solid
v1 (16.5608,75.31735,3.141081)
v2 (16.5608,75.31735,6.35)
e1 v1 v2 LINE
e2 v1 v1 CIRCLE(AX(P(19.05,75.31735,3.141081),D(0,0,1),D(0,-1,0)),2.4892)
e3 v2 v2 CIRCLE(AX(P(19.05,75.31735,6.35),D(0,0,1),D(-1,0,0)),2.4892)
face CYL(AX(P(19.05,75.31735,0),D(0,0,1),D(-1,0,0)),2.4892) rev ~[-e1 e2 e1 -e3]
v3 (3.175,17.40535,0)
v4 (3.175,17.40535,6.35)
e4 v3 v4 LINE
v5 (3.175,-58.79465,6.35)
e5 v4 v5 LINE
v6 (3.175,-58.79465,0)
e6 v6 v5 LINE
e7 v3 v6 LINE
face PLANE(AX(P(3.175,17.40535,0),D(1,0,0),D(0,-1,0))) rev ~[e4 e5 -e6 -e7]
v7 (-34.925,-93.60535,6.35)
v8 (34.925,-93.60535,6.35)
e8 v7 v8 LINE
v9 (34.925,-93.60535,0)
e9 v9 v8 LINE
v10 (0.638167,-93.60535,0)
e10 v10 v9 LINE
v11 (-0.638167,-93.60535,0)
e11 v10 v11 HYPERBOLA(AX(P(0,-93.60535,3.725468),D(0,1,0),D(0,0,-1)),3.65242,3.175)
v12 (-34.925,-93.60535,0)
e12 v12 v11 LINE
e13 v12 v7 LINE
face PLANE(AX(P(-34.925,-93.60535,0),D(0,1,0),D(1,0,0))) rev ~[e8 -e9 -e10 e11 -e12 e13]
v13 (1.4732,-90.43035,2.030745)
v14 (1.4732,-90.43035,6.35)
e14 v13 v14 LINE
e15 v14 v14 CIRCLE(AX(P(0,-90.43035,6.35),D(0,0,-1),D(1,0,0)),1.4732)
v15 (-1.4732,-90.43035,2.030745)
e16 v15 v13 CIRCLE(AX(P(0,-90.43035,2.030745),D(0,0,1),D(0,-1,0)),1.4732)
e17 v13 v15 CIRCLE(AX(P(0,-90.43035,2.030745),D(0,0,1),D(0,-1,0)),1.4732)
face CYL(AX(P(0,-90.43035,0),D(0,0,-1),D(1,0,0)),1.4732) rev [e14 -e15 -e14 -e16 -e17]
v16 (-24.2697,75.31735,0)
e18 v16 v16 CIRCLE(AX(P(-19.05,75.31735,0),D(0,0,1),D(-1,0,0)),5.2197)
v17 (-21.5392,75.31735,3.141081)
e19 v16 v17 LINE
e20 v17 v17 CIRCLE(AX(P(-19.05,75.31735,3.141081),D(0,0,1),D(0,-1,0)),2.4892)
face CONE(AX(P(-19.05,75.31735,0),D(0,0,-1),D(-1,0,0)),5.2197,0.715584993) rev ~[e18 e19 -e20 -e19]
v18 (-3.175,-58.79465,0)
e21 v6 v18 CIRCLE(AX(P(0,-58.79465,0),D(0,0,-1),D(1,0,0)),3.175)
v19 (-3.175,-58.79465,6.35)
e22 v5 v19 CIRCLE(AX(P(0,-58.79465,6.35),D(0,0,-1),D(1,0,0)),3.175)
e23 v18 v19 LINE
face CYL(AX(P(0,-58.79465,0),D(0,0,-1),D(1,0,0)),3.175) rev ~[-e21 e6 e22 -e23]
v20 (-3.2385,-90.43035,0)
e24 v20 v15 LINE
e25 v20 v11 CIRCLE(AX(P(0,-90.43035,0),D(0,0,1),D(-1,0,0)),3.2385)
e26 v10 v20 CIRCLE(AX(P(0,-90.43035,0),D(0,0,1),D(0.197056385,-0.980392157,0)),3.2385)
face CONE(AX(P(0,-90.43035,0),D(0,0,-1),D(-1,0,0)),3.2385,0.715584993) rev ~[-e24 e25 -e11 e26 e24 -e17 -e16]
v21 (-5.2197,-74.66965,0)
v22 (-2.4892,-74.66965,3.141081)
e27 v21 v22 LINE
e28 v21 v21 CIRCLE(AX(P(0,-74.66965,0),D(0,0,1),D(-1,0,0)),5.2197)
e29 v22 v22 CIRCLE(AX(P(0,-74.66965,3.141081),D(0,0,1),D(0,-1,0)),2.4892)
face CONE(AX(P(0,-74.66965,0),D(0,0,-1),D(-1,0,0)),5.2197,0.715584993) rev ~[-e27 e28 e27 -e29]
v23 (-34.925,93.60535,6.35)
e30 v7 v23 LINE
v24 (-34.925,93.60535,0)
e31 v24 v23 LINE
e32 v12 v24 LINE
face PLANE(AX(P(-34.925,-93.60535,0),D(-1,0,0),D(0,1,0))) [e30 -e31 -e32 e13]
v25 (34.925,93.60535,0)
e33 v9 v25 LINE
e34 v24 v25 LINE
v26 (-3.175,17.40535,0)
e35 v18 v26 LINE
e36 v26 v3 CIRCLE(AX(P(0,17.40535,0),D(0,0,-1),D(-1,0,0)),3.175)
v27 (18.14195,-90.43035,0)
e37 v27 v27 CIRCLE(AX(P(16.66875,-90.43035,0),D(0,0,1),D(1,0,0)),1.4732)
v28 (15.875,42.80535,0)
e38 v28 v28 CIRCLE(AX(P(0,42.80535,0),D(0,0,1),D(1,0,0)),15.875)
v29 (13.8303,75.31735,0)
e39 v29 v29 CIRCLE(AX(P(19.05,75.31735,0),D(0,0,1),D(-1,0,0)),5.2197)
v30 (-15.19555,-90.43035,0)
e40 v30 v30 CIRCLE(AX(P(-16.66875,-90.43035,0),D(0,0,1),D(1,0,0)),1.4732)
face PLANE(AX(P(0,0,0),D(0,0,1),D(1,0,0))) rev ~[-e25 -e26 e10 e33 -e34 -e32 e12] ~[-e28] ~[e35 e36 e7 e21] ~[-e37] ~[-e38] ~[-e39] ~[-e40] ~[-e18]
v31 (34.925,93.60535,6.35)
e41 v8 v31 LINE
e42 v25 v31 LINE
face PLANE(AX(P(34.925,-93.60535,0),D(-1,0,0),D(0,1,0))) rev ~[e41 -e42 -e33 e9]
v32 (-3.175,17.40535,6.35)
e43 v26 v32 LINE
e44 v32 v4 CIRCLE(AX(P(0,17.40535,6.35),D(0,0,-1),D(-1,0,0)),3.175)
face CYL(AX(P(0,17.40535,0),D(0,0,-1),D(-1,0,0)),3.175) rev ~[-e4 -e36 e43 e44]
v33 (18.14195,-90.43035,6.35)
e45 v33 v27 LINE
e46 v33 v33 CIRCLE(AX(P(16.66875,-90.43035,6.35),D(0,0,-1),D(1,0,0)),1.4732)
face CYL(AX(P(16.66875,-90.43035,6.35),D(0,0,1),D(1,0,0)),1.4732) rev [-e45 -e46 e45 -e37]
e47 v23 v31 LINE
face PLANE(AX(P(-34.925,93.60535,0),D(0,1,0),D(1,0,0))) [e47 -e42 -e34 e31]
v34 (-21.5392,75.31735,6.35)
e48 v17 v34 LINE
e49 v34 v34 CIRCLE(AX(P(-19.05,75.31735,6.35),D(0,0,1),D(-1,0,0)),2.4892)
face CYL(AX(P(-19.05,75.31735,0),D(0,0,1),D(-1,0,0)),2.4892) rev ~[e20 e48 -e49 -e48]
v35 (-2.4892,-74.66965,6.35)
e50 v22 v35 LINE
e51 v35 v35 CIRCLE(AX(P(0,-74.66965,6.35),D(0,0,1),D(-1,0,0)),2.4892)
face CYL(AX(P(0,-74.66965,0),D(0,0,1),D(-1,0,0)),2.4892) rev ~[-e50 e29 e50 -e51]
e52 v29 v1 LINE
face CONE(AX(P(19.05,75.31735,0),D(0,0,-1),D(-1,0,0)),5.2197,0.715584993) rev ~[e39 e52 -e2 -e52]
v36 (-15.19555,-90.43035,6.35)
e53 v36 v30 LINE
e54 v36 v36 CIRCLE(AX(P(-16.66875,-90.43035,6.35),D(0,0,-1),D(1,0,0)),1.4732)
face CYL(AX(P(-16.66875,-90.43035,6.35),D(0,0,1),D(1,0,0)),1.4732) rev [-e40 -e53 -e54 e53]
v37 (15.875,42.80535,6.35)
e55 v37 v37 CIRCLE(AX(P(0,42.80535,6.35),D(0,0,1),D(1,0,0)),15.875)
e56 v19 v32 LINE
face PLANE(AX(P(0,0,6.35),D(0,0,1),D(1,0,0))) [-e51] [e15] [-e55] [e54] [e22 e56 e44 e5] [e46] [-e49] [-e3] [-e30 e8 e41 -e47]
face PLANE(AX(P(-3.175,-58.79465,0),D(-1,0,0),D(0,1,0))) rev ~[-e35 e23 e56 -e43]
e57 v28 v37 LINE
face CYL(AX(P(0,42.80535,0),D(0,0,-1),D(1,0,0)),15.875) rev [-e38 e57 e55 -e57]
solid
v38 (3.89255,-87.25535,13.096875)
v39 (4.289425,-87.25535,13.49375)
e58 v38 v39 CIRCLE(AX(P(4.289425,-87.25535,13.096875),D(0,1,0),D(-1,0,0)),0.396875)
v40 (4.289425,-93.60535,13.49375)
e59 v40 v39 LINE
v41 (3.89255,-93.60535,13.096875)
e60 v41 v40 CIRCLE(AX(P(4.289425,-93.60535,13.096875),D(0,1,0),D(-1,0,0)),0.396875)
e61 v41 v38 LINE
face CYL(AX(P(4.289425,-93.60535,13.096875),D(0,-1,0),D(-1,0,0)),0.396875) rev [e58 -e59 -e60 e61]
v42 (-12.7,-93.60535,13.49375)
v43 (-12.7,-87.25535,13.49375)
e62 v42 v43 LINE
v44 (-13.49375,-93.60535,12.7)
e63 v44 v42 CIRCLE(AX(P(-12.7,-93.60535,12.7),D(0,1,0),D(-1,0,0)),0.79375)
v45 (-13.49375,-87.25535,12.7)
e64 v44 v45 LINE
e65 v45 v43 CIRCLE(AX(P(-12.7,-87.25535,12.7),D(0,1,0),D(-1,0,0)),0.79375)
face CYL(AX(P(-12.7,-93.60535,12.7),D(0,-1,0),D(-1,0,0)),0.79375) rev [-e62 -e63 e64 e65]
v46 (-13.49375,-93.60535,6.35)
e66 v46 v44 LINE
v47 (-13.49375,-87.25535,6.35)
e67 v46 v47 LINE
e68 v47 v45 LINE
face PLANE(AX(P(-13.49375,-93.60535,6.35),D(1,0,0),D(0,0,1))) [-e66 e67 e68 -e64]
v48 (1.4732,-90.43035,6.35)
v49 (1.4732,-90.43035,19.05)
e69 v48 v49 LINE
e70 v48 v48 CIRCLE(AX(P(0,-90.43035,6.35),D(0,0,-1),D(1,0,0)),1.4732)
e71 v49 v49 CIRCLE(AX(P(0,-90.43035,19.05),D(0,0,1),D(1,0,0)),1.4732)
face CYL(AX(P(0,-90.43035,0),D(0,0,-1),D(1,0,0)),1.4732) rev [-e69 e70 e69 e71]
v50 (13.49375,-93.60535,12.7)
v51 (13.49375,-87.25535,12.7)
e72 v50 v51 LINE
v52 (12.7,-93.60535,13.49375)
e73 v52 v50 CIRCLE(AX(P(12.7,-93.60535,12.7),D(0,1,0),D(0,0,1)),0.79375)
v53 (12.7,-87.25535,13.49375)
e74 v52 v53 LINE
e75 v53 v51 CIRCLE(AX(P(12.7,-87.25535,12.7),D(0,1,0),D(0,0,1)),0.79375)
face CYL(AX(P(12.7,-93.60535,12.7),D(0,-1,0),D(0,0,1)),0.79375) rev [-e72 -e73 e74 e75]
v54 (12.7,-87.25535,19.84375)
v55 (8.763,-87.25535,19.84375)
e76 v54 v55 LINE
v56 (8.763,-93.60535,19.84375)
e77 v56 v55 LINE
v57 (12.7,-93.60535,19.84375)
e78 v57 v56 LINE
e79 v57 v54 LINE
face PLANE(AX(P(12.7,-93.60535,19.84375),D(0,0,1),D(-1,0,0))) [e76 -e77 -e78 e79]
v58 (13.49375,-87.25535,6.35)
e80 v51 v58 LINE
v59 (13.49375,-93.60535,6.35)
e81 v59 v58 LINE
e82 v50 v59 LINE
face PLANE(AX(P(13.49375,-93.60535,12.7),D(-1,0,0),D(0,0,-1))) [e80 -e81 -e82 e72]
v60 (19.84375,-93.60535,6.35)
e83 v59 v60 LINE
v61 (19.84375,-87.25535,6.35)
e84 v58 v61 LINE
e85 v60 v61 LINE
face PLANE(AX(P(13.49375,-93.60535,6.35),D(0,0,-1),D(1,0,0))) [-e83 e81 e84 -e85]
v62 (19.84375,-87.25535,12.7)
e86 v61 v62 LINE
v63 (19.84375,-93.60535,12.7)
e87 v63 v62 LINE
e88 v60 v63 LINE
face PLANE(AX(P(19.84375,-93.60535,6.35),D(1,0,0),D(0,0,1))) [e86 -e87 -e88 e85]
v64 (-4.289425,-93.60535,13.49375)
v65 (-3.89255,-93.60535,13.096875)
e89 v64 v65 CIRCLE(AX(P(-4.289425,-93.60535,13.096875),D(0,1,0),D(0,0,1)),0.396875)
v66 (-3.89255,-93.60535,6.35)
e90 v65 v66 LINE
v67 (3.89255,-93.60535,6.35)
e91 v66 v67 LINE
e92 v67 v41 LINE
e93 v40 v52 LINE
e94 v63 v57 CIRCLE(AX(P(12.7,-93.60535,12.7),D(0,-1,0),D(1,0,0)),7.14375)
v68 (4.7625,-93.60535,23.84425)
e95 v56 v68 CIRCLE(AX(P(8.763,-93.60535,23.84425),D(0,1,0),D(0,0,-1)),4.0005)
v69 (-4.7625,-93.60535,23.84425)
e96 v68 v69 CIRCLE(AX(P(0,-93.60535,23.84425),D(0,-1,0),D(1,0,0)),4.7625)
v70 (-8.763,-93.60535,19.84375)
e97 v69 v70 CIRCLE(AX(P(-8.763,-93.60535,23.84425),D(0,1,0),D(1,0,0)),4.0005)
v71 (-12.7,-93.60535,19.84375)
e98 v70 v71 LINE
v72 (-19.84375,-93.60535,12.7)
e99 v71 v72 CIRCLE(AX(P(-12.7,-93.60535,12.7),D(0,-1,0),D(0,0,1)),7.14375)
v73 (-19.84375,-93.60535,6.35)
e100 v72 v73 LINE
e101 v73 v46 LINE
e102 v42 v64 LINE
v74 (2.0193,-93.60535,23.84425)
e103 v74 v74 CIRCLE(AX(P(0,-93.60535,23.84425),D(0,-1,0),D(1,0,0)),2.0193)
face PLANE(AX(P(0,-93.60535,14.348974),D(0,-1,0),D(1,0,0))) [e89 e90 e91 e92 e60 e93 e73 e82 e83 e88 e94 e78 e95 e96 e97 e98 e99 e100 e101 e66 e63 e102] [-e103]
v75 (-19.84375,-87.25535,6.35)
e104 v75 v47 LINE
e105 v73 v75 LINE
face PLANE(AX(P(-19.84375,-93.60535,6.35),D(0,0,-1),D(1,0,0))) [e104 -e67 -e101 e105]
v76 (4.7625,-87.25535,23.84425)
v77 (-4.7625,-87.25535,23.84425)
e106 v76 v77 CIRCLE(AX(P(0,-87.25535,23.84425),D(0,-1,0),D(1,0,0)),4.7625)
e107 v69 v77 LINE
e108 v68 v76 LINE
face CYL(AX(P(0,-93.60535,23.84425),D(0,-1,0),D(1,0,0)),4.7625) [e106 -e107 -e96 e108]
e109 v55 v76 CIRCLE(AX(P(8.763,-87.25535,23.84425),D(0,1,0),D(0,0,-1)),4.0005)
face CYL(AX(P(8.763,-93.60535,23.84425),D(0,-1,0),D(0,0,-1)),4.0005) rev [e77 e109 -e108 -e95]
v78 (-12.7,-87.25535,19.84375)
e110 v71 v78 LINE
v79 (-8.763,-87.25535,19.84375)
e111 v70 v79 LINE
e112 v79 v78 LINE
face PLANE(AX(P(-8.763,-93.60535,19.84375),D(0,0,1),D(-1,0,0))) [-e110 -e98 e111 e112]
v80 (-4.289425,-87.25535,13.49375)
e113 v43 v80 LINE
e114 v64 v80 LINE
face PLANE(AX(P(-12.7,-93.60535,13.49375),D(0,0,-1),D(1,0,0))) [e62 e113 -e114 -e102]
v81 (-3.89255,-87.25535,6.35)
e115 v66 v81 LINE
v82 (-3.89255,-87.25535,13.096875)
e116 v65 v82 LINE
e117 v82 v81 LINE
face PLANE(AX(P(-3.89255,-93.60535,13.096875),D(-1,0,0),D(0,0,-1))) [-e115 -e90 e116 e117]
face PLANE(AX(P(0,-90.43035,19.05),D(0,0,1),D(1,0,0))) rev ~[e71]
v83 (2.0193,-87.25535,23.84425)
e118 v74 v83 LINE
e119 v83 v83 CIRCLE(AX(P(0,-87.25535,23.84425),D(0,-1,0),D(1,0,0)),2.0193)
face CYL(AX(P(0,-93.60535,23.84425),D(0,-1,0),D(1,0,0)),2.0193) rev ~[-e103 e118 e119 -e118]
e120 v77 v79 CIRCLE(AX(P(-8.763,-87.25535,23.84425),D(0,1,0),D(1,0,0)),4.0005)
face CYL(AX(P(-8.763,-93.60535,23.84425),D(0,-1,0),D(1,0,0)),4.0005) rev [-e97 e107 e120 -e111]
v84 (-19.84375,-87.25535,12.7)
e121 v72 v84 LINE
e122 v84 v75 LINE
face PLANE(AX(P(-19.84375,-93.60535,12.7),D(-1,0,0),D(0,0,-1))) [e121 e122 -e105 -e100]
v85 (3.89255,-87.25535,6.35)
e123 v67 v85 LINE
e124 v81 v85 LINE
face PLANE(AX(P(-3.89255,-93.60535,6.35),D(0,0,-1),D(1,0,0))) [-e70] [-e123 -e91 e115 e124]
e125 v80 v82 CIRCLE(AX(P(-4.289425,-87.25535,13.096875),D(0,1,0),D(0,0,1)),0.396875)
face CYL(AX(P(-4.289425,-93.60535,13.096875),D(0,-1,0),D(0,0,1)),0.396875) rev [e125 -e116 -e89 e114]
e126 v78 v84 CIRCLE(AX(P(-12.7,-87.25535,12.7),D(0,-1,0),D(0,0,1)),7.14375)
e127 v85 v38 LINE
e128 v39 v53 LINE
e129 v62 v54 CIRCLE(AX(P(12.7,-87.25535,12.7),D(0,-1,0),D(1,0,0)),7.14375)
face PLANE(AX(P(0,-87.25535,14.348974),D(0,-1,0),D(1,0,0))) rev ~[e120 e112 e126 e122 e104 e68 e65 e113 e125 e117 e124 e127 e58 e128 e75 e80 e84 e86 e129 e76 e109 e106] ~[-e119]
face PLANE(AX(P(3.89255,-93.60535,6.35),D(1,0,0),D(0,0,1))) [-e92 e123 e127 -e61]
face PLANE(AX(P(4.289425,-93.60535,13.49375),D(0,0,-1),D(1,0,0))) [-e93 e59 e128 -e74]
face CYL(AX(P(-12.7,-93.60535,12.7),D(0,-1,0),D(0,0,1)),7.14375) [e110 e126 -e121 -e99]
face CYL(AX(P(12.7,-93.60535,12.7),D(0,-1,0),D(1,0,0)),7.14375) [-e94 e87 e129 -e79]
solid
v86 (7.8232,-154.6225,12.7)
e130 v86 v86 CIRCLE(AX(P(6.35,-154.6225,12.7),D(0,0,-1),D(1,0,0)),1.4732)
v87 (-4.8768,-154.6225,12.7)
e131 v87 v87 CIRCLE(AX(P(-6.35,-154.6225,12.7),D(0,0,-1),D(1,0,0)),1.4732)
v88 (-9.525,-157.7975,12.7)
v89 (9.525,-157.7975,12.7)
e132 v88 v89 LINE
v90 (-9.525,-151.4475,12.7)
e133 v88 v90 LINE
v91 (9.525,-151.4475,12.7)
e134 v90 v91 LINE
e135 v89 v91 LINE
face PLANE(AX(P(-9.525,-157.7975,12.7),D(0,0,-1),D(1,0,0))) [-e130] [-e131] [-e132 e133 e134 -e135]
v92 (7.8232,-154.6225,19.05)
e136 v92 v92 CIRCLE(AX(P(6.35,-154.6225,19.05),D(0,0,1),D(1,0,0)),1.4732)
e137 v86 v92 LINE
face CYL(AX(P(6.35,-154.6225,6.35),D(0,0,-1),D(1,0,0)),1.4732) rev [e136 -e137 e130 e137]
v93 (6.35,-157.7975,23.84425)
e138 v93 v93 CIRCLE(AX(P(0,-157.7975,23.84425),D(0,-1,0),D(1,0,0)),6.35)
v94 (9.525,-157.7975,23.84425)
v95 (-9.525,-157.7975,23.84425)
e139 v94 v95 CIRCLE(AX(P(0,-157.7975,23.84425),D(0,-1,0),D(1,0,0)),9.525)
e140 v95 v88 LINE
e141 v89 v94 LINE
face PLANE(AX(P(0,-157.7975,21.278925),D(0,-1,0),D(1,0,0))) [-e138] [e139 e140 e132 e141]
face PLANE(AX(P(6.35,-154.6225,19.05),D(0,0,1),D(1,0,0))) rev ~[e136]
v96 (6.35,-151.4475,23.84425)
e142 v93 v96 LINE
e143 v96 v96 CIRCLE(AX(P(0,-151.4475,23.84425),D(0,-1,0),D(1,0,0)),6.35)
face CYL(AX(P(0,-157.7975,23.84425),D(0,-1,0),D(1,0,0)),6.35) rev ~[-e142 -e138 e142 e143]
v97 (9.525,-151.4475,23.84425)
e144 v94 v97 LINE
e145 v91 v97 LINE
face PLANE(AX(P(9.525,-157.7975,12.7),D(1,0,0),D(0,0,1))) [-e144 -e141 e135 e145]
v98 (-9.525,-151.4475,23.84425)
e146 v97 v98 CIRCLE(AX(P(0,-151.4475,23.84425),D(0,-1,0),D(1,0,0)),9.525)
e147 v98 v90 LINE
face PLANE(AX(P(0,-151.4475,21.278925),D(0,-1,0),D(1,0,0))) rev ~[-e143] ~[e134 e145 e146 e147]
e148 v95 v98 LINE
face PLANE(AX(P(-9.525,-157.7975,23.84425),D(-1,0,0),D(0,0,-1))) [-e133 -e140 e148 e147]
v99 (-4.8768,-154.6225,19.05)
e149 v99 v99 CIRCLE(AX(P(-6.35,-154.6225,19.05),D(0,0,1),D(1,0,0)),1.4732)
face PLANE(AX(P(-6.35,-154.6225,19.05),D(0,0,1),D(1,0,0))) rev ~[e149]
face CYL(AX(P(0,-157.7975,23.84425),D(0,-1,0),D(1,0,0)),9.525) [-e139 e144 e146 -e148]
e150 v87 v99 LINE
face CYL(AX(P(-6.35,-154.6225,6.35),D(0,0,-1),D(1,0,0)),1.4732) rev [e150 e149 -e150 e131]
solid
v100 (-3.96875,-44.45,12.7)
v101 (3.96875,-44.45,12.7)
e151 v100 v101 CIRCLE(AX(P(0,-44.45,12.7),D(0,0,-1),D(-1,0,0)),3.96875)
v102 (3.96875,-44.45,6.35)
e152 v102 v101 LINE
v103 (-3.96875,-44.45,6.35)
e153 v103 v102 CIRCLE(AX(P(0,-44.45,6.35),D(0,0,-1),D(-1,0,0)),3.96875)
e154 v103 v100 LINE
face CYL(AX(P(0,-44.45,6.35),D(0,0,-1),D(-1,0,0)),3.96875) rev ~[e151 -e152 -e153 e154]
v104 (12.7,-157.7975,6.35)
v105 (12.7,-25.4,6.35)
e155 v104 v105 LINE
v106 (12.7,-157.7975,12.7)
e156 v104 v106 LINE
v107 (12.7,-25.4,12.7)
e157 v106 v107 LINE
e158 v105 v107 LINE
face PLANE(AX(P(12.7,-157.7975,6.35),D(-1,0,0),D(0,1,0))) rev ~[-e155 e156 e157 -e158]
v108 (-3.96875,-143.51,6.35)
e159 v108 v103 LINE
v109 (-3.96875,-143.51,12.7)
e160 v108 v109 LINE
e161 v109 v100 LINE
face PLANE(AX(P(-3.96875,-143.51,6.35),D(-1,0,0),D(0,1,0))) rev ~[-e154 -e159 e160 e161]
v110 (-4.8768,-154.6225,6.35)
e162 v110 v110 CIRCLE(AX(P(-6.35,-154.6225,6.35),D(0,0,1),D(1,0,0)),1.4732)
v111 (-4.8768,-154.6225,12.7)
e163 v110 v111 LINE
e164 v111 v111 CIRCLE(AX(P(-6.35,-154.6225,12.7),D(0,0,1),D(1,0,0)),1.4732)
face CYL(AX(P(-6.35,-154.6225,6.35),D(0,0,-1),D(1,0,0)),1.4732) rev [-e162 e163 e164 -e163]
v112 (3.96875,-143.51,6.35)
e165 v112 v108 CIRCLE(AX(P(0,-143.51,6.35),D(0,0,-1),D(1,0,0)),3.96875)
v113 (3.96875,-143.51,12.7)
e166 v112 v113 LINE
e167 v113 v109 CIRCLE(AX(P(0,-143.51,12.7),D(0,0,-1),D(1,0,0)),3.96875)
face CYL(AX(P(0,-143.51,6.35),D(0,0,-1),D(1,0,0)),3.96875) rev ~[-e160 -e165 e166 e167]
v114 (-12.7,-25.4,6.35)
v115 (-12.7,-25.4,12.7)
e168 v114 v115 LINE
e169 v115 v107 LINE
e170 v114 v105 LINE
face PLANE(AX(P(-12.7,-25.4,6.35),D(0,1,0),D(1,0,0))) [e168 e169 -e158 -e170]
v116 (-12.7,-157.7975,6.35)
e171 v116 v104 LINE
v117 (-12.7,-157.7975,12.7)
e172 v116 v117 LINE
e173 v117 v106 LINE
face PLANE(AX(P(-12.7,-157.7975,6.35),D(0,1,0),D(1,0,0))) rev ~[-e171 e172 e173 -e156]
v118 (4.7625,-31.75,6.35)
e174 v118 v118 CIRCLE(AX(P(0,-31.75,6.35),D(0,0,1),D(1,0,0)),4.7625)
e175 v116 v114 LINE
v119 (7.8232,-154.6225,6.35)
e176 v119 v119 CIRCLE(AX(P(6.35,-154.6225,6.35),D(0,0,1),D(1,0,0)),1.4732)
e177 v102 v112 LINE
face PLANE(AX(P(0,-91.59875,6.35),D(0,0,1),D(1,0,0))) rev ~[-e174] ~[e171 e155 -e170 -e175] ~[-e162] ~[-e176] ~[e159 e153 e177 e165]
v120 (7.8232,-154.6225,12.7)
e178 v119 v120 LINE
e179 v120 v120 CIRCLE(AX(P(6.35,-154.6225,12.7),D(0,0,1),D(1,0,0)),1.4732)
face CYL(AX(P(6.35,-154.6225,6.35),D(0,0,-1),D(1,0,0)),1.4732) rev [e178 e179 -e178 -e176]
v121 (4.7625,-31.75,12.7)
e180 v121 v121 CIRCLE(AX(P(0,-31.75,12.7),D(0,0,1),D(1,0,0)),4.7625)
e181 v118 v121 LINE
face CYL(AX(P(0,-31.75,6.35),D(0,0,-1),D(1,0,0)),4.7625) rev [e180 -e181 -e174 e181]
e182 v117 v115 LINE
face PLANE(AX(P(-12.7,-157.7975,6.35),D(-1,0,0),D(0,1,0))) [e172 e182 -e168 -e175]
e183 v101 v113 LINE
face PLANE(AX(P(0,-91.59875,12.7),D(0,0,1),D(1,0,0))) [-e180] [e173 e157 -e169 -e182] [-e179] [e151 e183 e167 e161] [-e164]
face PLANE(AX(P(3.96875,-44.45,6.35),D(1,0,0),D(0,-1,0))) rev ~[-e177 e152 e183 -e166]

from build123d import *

# Parameters (mm, degrees)
F2_W            = 69.85
F2_H            = 187.2107
F2_R            = 1.4732
F2_R_2          = 2.15265
F2_R_3          = 15.875
F3_DEPTH        = 6.35
F4_W            = 25.4
F4_H            = 132.3975
F4_R            = 1.4732
F4_R_2          = 4.7625
F5_DEPTH        = 6.35
F6_R            = 2.0193
F7_DEPTH        = 6.35
F8_R            = 6.35
F9_DEPTH        = 6.35
F10_R           = 1.4732
F11_DEPTH       = 6.351
F12_D           = 4.9784
F12_CSINK_D     = 10.4394
F12_CSINK_ANGLE = 82
F13_D           = 2.9464
F13_CSINK_D     = 6.477
F13_CSINK_ANGLE = 82
F14_DEPTH       = 12.7
F15_DEPTH       = 19.05


# Not quite as in the source:
# - a variable given as a bare number and used for a length is read in inches; the dataset says mm whatever the document's units were


with BuildPart() as f3:
    # F2 (on Top) → F3 (new body)
    with BuildSketch(Plane.XY):
        Rectangle(F2_W, F2_H)
        with Locations((0, -90.43035)):
            Circle(F2_R, mode=Mode.SUBTRACT)
        with Locations((0, -74.66965)):
            Circle(F2_R_2, mode=Mode.SUBTRACT)
        with BuildLine():
            ThreePointArc((-3.175, 17.40535), (0, 20.58035), (3.175, 17.40535))
            Line((3.175, 17.40535), (3.175, -58.79465))
            ThreePointArc((3.175, -58.79465), (0, -61.96965), (-3.175, -58.79465))
            Line((-3.175, -58.79465), (-3.175, 17.40535))
        make_face(mode=Mode.SUBTRACT)
        with Locations((-19.05, 75.31735)):
            Circle(F2_R_2, mode=Mode.SUBTRACT)
        with Locations((0, 42.80535)):
            Circle(F2_R_3, mode=Mode.SUBTRACT)
        with Locations((19.05, 75.31735)):
            Circle(F2_R_2, mode=Mode.SUBTRACT)
    extrude(amount=F3_DEPTH)

    # F10 (on face) → F11 (cut, through all)
    with BuildSketch(Plane(origin=(0, 0, 6.35), x_dir=(1, 0, 0), z_dir=(0, 0, -1))):
        with Locations((-16.66875, 90.43035)):
            Circle(F10_R)
        with Locations((16.66875, 90.43035)):
            Circle(F10_R)
    extrude(amount=F11_DEPTH, mode=Mode.SUBTRACT)

    # F12 (through all)
    with Locations(Plane(origin=(0, 0, 0), x_dir=(1, 0, 0), z_dir=(0, 0, -1))):
        with Locations((19.05, -75.31735), (-19.05, -75.31735), (0, 74.66965)):
            CounterSinkHole(F12_D / 2, F12_CSINK_D / 2, counter_sink_angle=F12_CSINK_ANGLE)

    # F13 (through all)
    with Locations(Plane(origin=(0, 0, 0), x_dir=(1, 0, 0), z_dir=(0, 0, -1))):
        with Locations((0, 90.43035)):
            CounterSinkHole(F13_D / 2, F13_CSINK_D / 2, counter_sink_angle=F13_CSINK_ANGLE)


with BuildPart() as f5:
    # F4 (on face) → F5 (new body)
    with BuildSketch(Plane.XY.offset(6.35)):
        with Locations((0, -91.59875)):
            Rectangle(F4_W, F4_H)
        with Locations((-6.35, -154.6225)):
            Circle(F4_R, mode=Mode.SUBTRACT)
        with BuildLine():
            ThreePointArc((-3.96875, -44.45), (0, -40.48125), (3.96875, -44.45))
            Line((3.96875, -44.45), (3.96875, -143.51))
            ThreePointArc((3.96875, -143.51), (0, -147.47875), (-3.96875, -143.51))
            Line((-3.96875, -143.51), (-3.96875, -44.45))
        make_face(mode=Mode.SUBTRACT)
        with Locations((6.35, -154.6225)):
            Circle(F4_R, mode=Mode.SUBTRACT)
        with Locations((0, -31.75)):
            Circle(F4_R_2, mode=Mode.SUBTRACT)
    extrude(amount=F5_DEPTH)


with BuildPart() as f7:
    # F6 (on face) → F7 (new body)
    with BuildSketch(Plane.XZ.offset(93.60535)):
        with BuildLine():
            ThreePointArc((8.763, 19.84375), (5.9342193219, 21.0154693219), (4.7625, 23.84425))
            ThreePointArc((4.7625, 23.84425), (0, 28.60675), (-4.7625, 23.84425))
            ThreePointArc((-4.7625, 23.84425), (-5.9342193219, 21.0154693219), (-8.763, 19.84375))
            Line((-8.763, 19.84375), (-12.7, 19.84375))
            ThreePointArc((-12.7, 19.84375), (-17.7513940681, 17.7513940681), (-19.84375, 12.7))
            Line((-19.84375, 12.7), (-19.84375, 6.35))
            Line((-19.84375, 6.35), (-13.49375, 6.35))
            Line((-13.49375, 6.35), (-13.49375, 12.7))
            ThreePointArc((-13.49375, 12.7), (-13.2612660076, 13.2612660076), (-12.7, 13.49375))
            Line((-12.7, 13.49375), (-4.289425, 13.49375))
            ThreePointArc((-4.289425, 13.49375), (-4.0087919962, 13.3775080038), (-3.89255, 13.096875))
            Line((-3.89255, 13.096875), (-3.89255, 6.35))
            Line((-3.89255, 6.35), (0, 6.35))
            Line((0, 6.35), (3.89255, 6.35))
            Line((3.89255, 6.35), (3.89255, 13.096875))
            ThreePointArc((3.89255, 13.096875), (4.0087919962, 13.3775080038), (4.289425, 13.49375))
            Line((4.289425, 13.49375), (12.7, 13.49375))
            ThreePointArc((12.7, 13.49375), (13.2612660076, 13.2612660076), (13.49375, 12.7))
            Line((13.49375, 12.7), (13.49375, 6.35))
            Line((13.49375, 6.35), (19.84375, 6.35))
            Line((19.84375, 6.35), (19.84375, 12.7))
            ThreePointArc((19.84375, 12.7), (17.7513940681, 17.7513940681), (12.7, 19.84375))
            Line((12.7, 19.84375), (8.763, 19.84375))
        make_face()
        with Locations((0, 23.84425)):
            Circle(F6_R, mode=Mode.SUBTRACT)
    extrude(amount=-F7_DEPTH)

    # F2 (on Top) → F15 (cut)
    with BuildSketch(Plane.XY):
        with Locations((0, -90.43035)):
            Circle(F2_R)
    extrude(amount=F15_DEPTH, mode=Mode.SUBTRACT)


with BuildPart() as f9:
    # F8 (on face) → F9 (new body)
    with BuildSketch(Plane.XZ.offset(157.7975)):
        with BuildLine():
            Line((-9.525, 23.84425), (-9.525, 12.7))
            Line((-9.525, 12.7), (9.525, 12.7))
            Line((9.525, 12.7), (9.525, 23.84425))
            ThreePointArc((9.525, 23.84425), (0, 33.36925), (-9.525, 23.84425))
        make_face()
        with Locations((0, 23.84425)):
            Circle(F8_R, mode=Mode.SUBTRACT)
    extrude(amount=-F9_DEPTH)

    # F4 (on face) → F14 (cut)
    with BuildSketch(Plane.XY.offset(6.35)):
        with Locations((6.35, -154.6225)):
            Circle(F4_R)
        with Locations((-6.35, -154.6225)):
            Circle(F4_R)
    extrude(amount=F14_DEPTH, mode=Mode.SUBTRACT)


solid = Compound([f3.part, f5.part, f7.part, f9.part])
